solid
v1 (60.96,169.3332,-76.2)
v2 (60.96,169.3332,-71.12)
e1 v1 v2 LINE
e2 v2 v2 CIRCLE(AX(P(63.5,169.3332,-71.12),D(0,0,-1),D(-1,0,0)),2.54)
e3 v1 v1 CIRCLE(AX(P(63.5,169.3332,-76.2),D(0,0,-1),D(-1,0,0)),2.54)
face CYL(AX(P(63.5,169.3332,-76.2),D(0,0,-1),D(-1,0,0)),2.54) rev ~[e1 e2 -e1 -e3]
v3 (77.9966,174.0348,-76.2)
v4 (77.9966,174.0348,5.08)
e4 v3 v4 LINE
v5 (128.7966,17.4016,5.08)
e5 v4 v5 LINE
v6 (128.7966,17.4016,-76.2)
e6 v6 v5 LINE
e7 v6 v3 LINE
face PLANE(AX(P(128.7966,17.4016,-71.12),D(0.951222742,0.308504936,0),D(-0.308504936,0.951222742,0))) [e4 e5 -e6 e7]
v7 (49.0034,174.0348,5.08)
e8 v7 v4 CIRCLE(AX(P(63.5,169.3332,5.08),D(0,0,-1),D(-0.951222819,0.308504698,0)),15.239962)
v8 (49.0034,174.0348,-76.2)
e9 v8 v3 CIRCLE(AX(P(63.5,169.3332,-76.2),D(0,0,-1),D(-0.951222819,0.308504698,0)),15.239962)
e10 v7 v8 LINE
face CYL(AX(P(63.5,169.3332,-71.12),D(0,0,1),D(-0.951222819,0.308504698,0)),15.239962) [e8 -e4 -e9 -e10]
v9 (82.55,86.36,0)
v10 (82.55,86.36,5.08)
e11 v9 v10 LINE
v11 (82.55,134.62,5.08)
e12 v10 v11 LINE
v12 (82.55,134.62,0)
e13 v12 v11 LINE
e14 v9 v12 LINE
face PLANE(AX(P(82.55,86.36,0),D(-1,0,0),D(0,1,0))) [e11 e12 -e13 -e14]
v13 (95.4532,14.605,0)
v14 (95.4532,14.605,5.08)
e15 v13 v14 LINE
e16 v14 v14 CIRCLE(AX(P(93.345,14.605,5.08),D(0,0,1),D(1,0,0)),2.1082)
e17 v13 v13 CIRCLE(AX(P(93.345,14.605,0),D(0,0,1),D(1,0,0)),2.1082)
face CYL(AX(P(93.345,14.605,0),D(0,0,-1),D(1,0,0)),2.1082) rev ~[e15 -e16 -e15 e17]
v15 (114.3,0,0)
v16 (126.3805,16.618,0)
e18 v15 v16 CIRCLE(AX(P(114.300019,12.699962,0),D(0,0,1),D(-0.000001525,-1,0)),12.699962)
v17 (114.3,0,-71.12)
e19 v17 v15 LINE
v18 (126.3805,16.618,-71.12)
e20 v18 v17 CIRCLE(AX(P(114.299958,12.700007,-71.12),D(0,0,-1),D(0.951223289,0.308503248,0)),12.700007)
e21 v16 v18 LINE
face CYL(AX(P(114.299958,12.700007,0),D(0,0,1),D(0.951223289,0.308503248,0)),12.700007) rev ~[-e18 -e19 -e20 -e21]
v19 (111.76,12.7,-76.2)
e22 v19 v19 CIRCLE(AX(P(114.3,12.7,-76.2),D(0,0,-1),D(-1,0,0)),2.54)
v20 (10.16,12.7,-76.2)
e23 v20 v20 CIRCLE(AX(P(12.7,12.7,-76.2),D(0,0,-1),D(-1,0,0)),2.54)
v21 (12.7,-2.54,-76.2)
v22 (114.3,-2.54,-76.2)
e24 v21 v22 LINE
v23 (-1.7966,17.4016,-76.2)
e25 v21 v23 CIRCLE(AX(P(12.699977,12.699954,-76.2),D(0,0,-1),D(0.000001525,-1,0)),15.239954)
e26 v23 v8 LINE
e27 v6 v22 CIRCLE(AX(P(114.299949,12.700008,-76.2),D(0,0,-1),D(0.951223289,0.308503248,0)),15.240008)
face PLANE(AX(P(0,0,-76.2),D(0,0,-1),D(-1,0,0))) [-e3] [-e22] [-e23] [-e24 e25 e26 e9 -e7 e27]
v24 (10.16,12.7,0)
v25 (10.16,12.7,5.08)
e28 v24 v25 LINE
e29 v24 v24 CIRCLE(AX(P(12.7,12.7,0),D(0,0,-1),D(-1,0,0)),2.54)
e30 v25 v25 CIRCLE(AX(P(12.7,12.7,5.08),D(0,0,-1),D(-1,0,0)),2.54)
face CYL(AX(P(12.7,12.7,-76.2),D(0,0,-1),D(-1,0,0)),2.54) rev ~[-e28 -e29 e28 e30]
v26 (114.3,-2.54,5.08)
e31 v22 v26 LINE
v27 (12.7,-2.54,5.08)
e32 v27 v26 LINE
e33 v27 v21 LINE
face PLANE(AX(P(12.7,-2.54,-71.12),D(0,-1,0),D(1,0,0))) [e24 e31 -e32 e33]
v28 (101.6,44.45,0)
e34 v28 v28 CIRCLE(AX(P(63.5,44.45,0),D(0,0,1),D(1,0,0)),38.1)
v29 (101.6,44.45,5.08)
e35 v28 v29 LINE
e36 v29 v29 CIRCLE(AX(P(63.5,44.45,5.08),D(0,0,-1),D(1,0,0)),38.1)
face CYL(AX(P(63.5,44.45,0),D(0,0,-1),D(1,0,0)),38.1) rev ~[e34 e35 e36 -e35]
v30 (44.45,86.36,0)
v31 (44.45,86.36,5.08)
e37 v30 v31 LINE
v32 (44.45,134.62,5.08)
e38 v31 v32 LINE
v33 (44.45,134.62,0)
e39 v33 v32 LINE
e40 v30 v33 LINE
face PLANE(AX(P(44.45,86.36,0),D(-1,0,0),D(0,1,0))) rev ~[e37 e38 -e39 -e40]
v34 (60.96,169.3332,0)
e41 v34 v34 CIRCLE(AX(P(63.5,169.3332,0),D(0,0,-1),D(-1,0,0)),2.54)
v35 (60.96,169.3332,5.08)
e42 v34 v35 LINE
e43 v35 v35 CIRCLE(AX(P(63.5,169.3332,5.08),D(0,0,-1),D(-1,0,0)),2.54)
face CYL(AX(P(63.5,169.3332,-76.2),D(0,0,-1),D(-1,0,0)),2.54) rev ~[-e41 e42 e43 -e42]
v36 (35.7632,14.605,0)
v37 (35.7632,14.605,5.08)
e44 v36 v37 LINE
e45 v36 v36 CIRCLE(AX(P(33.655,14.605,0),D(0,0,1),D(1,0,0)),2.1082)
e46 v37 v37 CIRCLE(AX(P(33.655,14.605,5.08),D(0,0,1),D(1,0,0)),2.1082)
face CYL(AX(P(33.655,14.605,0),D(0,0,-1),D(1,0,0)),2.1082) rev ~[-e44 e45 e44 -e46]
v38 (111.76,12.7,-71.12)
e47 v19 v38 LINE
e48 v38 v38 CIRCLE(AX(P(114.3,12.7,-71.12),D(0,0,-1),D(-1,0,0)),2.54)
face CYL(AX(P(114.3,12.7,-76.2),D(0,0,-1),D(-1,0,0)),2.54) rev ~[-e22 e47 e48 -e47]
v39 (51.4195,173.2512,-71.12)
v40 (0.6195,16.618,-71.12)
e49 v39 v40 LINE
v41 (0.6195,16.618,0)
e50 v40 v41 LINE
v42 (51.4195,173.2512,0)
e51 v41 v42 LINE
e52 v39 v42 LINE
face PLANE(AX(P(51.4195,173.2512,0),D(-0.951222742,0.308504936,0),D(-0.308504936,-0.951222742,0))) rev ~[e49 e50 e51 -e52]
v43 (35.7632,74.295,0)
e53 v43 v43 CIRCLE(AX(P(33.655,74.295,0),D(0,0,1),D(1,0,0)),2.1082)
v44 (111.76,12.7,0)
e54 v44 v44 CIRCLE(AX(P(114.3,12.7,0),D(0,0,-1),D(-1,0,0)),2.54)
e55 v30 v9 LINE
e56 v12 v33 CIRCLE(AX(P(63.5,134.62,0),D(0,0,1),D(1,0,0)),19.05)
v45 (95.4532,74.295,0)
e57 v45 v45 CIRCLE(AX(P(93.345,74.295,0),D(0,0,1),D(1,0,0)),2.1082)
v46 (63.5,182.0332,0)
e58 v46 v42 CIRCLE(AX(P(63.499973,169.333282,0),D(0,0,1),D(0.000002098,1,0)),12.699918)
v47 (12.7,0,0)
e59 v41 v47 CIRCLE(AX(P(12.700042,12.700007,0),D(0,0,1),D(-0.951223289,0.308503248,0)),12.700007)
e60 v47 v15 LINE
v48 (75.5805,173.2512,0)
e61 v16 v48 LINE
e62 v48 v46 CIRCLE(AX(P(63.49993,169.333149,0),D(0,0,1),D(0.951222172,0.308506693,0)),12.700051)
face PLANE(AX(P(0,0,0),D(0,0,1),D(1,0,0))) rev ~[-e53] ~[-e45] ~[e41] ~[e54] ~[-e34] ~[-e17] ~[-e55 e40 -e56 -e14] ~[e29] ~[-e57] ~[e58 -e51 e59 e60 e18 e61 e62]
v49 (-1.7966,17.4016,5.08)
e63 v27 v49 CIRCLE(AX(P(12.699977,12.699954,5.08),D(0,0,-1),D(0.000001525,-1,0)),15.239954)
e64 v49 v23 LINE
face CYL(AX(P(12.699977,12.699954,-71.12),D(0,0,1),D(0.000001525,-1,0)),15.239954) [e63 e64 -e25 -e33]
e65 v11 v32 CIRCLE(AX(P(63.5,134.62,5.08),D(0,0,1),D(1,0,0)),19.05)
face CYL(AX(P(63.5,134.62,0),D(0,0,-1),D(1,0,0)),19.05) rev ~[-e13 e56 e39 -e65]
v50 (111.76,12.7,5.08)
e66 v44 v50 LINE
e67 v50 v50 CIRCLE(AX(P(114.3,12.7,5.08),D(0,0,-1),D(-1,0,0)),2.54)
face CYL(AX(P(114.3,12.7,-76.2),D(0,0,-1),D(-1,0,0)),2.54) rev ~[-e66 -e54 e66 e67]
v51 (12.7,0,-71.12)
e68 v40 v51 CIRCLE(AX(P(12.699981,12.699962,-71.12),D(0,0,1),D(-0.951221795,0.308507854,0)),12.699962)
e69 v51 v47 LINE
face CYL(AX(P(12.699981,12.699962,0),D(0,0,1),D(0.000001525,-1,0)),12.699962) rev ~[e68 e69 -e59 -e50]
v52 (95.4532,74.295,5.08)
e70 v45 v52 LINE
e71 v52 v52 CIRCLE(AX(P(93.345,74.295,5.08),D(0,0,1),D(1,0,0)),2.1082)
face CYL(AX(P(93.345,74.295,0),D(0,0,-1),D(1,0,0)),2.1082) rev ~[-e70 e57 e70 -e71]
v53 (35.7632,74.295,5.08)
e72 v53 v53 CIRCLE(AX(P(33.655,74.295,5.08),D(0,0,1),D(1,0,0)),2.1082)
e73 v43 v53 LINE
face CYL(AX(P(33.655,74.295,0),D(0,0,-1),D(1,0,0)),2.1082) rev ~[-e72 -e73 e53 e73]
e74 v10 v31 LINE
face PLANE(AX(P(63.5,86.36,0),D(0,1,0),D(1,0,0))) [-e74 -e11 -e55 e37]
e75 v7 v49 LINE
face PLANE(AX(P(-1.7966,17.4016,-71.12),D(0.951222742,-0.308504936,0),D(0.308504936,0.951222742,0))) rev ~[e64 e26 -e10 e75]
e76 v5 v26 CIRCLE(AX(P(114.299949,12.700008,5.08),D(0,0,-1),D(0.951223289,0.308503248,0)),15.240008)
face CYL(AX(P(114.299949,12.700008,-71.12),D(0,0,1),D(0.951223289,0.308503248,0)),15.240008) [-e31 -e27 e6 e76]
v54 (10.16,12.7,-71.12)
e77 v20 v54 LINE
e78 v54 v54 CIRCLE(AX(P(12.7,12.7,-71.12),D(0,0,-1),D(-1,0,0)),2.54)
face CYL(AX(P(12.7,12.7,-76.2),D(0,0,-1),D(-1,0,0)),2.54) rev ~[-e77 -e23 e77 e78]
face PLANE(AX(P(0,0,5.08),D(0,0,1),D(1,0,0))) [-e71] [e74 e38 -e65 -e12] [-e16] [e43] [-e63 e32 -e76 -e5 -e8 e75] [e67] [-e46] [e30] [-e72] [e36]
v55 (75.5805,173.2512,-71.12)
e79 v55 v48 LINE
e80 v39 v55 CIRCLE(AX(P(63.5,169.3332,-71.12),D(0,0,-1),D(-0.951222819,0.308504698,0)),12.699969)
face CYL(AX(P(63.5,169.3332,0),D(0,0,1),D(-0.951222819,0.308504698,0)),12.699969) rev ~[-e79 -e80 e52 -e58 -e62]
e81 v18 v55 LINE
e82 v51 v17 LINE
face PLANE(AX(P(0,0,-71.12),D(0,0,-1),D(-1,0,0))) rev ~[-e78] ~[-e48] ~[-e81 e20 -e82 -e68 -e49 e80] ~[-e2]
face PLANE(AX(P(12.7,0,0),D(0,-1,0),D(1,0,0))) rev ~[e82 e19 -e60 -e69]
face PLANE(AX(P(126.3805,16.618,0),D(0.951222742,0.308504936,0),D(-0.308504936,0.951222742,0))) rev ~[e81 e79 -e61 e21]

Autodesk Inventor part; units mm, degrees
ref_plane "YZ Plane" through (0, 0, 0) normal (1, 0, 0) x (0, 1, 0)
ref_plane "XZ Plane" through (0, 0, 0) normal (0, 1, 0) x (-1, 0, 0)
ref_plane "XY Plane" through (0, 0, 0) normal (0, 0, 1) x (1, 0, 0)
sketch "Sketch1" plane through (0, 0, 0) normal (0, 0, 1) x (1, 0, 0)
  arc A0 (0.6195, 16.618) -> (12.7, 0) centre (12.7, 12.7) ccw
  arc A1 (63.5, 182.0332) -> (51.4195, 173.2512) centre (63.5, 169.3332) ccw
  line L0 (0.6195, 16.618) -> (51.4195, 173.2512)
  arc A2 (114.3, 0) -> (126.3805, 16.618) centre (114.3, 12.7) ccw
  arc A3 (75.5805, 173.2512) -> (63.5, 182.0332) centre (63.5, 169.3332) ccw
  line L1 (126.3805, 16.618) -> (75.5805, 173.2512)
  line L2 (12.7, 0) -> (114.3, 0)
  line L3 (63.5, 50.8) -> (63.5, 44.45)
  circle A4 centre (63.5, 44.45) radius 38.1
  circle A5 centre (33.655, 74.295) radius 2.1082
  circle A6 centre (93.345, 74.295) radius 2.1082
  circle A7 centre (93.345, 14.605) radius 2.1082
  circle A8 centre (33.655, 14.605) radius 2.1082
  line L4 (63.5, 82.55) -> (63.5, 86.36)
  line L5 (63.5, 86.36) -> (82.55, 86.36)
  line L6 (63.5, 86.36) -> (44.45, 86.36)
  line L7 (82.55, 86.36) -> (82.55, 134.62)
  line L8 (44.45, 86.36) -> (44.45, 134.62)
  arc A9 (82.55, 134.62) -> (44.45, 134.62) centre (63.5, 134.62) ccw
  point P0 (0, 0)
  dimension "d30" = 76.2
  dimension "d7" = 25.4
  dimension "d9" = 12.7
  dimension "d10" = 12.7
  dimension "d11" = 12.7
  dimension "d14" = 101.6
  dimension "d15" = 35.938
  dimension "d16" = 72.031
  dimension "d17" = 12.7
  dimension "d18" = 169.3332
  dimension "d19" = 109.3442
  dimension "d20" = 164.6651
  dimension "d21" = 164.6651
  dimension "d29" = 6.35
  dimension "d33" = 4.2164
  dimension "d34" = 4.2164
  dimension "d35" = 4.2164
  dimension "d36" = 4.2164
  dimension "d50" = 3.81
  dimension "d51" = 19.05
  dimension "d52" = 19.05
  dimension "d53" = 48.26
  dimension "d54" = 48.26
extrude "Extrusion2" add sketch "Sketch1" along normal blind 5.08
sketch "Sketch2" plane through (0, 0, 0) normal (0, 0, -1) x (-1, 0, 0)
  line L0 (-126.3805, 16.618) -> (-75.5805, 173.2512) projected
  line L1 (-126.3805, 16.618) -> (-75.5805, 173.2512)
  line L2 (-51.4195, 173.2512) -> (-0.6195, 16.618) projected
  line L3 (-51.4195, 173.2512) -> (-0.6195, 16.618)
  line L4 (-12.7, 0) -> (-114.3, 0) projected
  line L5 (-114.3, 0) -> (-12.7, 0)
  arc A0 (-126.3805, 16.618) -> (-114.3, 0) centre (-114.3, 12.7) ccw projected
  arc A1 (-126.3805, 16.618) -> (-126.3805, 16.618) centre (-114.3, 12.7) ccw
  arc A2 (-12.7, 0) -> (-0.6195, 16.618) centre (-12.7, 12.7) ccw projected
  arc A3 (-12.7, 0) -> (-12.7, 0) centre (-12.7, 12.7) ccw
  arc A4 (-51.4195, 173.2512) -> (-75.5805, 173.2512) centre (-63.5, 169.3332) ccw projected
  arc A5 (-75.5805, 173.2512) -> (-75.5805, 173.2512) centre (-63.5, 169.3332) ccw
  arc A6 (-49.0034, 174.0348) -> (-77.9966, 174.0348) centre (-63.5, 169.3332) ccw
  arc A7 (-128.7966, 17.4016) -> (-114.3, -2.54) centre (-114.3, 12.7) ccw
  arc A8 (-12.7, -2.54) -> (1.7966, 17.4016) centre (-12.7, 12.7) ccw
  line L6 (-12.7, -2.54) -> (-114.3, -2.54)
  line L7 (-77.9966, 174.0348) -> (-128.7966, 17.4016)
  line L8 (-49.0034, 174.0348) -> (1.7966, 17.4016)
  point P0 (0, 0)
  dimension "d57" = 30.48
  dimension "d58" = 30.48
  dimension "d59" = 30.48
extrude "Extrusion3" add sketch "Sketch2" along normal blind 71.12 and the other way blind 5.08
sketch "Sketch3" plane through (0, 0, -71.12) normal (0, 0, -1) x (-1, 0, 0)
  line L0 (-12.7, -2.54) -> (-114.3, -2.54) projected
  line L1 (-114.3, -2.54) -> (-12.7, -2.54)
  line L2 (1.7966, 17.4016) -> (-49.0034, 174.0348) projected
  line L3 (1.7966, 17.4016) -> (-49.0034, 174.0348)
  line L4 (-128.7966, 17.4016) -> (-77.9966, 174.0348) projected
  line L5 (-77.9966, 174.0348) -> (-128.7966, 17.4016)
  arc A0 (-128.7966, 17.4016) -> (-114.3, -2.54) centre (-114.3, 12.7) ccw projected
  arc A1 (-128.7966, 17.4016) -> (-114.3, -2.54) centre (-114.3, 12.7) ccw
  arc A2 (-12.7, -2.54) -> (1.7966, 17.4016) centre (-12.7, 12.7) ccw projected
  arc A3 (-12.7, -2.54) -> (1.7966, 17.4016) centre (-12.7, 12.7) ccw
  arc A4 (-49.0034, 174.0348) -> (-77.9966, 174.0348) centre (-63.5, 169.3332) ccw
  point P0 (0, 0)
extrude "Extrusion4" add sketch "Sketch3" along normal blind 5.08
sketch "Sketch4" plane through (0, 0, -76.2) normal (0, 0, -1) x (-1, 0, 0)
  arc A0 (-49.0034, 174.0348) -> (-77.9966, 174.0348) centre (-63.5, 169.3332) ccw projected
  circle A1 centre (-63.5, 169.3332) radius 2.54
  arc A2 (-126.3805, 16.618) -> (-114.3, 0) centre (-114.3, 12.7) ccw projected
  circle A3 centre (-114.3, 12.7) radius 2.54
  arc A4 (-12.7, 0) -> (-0.6195, 16.618) centre (-12.7, 12.7) ccw projected
  circle A5 centre (-12.7, 12.7) radius 2.54
  point P0 (0, 0)
  dimension "d66" = 5.08
  dimension "d67" = 5.08
  dimension "d68" = 5.08
extrude "Extrusion5" cut sketch "Sketch4" against normal blind 81.28
properties part number "Nathan_New_LED_Speaker"
